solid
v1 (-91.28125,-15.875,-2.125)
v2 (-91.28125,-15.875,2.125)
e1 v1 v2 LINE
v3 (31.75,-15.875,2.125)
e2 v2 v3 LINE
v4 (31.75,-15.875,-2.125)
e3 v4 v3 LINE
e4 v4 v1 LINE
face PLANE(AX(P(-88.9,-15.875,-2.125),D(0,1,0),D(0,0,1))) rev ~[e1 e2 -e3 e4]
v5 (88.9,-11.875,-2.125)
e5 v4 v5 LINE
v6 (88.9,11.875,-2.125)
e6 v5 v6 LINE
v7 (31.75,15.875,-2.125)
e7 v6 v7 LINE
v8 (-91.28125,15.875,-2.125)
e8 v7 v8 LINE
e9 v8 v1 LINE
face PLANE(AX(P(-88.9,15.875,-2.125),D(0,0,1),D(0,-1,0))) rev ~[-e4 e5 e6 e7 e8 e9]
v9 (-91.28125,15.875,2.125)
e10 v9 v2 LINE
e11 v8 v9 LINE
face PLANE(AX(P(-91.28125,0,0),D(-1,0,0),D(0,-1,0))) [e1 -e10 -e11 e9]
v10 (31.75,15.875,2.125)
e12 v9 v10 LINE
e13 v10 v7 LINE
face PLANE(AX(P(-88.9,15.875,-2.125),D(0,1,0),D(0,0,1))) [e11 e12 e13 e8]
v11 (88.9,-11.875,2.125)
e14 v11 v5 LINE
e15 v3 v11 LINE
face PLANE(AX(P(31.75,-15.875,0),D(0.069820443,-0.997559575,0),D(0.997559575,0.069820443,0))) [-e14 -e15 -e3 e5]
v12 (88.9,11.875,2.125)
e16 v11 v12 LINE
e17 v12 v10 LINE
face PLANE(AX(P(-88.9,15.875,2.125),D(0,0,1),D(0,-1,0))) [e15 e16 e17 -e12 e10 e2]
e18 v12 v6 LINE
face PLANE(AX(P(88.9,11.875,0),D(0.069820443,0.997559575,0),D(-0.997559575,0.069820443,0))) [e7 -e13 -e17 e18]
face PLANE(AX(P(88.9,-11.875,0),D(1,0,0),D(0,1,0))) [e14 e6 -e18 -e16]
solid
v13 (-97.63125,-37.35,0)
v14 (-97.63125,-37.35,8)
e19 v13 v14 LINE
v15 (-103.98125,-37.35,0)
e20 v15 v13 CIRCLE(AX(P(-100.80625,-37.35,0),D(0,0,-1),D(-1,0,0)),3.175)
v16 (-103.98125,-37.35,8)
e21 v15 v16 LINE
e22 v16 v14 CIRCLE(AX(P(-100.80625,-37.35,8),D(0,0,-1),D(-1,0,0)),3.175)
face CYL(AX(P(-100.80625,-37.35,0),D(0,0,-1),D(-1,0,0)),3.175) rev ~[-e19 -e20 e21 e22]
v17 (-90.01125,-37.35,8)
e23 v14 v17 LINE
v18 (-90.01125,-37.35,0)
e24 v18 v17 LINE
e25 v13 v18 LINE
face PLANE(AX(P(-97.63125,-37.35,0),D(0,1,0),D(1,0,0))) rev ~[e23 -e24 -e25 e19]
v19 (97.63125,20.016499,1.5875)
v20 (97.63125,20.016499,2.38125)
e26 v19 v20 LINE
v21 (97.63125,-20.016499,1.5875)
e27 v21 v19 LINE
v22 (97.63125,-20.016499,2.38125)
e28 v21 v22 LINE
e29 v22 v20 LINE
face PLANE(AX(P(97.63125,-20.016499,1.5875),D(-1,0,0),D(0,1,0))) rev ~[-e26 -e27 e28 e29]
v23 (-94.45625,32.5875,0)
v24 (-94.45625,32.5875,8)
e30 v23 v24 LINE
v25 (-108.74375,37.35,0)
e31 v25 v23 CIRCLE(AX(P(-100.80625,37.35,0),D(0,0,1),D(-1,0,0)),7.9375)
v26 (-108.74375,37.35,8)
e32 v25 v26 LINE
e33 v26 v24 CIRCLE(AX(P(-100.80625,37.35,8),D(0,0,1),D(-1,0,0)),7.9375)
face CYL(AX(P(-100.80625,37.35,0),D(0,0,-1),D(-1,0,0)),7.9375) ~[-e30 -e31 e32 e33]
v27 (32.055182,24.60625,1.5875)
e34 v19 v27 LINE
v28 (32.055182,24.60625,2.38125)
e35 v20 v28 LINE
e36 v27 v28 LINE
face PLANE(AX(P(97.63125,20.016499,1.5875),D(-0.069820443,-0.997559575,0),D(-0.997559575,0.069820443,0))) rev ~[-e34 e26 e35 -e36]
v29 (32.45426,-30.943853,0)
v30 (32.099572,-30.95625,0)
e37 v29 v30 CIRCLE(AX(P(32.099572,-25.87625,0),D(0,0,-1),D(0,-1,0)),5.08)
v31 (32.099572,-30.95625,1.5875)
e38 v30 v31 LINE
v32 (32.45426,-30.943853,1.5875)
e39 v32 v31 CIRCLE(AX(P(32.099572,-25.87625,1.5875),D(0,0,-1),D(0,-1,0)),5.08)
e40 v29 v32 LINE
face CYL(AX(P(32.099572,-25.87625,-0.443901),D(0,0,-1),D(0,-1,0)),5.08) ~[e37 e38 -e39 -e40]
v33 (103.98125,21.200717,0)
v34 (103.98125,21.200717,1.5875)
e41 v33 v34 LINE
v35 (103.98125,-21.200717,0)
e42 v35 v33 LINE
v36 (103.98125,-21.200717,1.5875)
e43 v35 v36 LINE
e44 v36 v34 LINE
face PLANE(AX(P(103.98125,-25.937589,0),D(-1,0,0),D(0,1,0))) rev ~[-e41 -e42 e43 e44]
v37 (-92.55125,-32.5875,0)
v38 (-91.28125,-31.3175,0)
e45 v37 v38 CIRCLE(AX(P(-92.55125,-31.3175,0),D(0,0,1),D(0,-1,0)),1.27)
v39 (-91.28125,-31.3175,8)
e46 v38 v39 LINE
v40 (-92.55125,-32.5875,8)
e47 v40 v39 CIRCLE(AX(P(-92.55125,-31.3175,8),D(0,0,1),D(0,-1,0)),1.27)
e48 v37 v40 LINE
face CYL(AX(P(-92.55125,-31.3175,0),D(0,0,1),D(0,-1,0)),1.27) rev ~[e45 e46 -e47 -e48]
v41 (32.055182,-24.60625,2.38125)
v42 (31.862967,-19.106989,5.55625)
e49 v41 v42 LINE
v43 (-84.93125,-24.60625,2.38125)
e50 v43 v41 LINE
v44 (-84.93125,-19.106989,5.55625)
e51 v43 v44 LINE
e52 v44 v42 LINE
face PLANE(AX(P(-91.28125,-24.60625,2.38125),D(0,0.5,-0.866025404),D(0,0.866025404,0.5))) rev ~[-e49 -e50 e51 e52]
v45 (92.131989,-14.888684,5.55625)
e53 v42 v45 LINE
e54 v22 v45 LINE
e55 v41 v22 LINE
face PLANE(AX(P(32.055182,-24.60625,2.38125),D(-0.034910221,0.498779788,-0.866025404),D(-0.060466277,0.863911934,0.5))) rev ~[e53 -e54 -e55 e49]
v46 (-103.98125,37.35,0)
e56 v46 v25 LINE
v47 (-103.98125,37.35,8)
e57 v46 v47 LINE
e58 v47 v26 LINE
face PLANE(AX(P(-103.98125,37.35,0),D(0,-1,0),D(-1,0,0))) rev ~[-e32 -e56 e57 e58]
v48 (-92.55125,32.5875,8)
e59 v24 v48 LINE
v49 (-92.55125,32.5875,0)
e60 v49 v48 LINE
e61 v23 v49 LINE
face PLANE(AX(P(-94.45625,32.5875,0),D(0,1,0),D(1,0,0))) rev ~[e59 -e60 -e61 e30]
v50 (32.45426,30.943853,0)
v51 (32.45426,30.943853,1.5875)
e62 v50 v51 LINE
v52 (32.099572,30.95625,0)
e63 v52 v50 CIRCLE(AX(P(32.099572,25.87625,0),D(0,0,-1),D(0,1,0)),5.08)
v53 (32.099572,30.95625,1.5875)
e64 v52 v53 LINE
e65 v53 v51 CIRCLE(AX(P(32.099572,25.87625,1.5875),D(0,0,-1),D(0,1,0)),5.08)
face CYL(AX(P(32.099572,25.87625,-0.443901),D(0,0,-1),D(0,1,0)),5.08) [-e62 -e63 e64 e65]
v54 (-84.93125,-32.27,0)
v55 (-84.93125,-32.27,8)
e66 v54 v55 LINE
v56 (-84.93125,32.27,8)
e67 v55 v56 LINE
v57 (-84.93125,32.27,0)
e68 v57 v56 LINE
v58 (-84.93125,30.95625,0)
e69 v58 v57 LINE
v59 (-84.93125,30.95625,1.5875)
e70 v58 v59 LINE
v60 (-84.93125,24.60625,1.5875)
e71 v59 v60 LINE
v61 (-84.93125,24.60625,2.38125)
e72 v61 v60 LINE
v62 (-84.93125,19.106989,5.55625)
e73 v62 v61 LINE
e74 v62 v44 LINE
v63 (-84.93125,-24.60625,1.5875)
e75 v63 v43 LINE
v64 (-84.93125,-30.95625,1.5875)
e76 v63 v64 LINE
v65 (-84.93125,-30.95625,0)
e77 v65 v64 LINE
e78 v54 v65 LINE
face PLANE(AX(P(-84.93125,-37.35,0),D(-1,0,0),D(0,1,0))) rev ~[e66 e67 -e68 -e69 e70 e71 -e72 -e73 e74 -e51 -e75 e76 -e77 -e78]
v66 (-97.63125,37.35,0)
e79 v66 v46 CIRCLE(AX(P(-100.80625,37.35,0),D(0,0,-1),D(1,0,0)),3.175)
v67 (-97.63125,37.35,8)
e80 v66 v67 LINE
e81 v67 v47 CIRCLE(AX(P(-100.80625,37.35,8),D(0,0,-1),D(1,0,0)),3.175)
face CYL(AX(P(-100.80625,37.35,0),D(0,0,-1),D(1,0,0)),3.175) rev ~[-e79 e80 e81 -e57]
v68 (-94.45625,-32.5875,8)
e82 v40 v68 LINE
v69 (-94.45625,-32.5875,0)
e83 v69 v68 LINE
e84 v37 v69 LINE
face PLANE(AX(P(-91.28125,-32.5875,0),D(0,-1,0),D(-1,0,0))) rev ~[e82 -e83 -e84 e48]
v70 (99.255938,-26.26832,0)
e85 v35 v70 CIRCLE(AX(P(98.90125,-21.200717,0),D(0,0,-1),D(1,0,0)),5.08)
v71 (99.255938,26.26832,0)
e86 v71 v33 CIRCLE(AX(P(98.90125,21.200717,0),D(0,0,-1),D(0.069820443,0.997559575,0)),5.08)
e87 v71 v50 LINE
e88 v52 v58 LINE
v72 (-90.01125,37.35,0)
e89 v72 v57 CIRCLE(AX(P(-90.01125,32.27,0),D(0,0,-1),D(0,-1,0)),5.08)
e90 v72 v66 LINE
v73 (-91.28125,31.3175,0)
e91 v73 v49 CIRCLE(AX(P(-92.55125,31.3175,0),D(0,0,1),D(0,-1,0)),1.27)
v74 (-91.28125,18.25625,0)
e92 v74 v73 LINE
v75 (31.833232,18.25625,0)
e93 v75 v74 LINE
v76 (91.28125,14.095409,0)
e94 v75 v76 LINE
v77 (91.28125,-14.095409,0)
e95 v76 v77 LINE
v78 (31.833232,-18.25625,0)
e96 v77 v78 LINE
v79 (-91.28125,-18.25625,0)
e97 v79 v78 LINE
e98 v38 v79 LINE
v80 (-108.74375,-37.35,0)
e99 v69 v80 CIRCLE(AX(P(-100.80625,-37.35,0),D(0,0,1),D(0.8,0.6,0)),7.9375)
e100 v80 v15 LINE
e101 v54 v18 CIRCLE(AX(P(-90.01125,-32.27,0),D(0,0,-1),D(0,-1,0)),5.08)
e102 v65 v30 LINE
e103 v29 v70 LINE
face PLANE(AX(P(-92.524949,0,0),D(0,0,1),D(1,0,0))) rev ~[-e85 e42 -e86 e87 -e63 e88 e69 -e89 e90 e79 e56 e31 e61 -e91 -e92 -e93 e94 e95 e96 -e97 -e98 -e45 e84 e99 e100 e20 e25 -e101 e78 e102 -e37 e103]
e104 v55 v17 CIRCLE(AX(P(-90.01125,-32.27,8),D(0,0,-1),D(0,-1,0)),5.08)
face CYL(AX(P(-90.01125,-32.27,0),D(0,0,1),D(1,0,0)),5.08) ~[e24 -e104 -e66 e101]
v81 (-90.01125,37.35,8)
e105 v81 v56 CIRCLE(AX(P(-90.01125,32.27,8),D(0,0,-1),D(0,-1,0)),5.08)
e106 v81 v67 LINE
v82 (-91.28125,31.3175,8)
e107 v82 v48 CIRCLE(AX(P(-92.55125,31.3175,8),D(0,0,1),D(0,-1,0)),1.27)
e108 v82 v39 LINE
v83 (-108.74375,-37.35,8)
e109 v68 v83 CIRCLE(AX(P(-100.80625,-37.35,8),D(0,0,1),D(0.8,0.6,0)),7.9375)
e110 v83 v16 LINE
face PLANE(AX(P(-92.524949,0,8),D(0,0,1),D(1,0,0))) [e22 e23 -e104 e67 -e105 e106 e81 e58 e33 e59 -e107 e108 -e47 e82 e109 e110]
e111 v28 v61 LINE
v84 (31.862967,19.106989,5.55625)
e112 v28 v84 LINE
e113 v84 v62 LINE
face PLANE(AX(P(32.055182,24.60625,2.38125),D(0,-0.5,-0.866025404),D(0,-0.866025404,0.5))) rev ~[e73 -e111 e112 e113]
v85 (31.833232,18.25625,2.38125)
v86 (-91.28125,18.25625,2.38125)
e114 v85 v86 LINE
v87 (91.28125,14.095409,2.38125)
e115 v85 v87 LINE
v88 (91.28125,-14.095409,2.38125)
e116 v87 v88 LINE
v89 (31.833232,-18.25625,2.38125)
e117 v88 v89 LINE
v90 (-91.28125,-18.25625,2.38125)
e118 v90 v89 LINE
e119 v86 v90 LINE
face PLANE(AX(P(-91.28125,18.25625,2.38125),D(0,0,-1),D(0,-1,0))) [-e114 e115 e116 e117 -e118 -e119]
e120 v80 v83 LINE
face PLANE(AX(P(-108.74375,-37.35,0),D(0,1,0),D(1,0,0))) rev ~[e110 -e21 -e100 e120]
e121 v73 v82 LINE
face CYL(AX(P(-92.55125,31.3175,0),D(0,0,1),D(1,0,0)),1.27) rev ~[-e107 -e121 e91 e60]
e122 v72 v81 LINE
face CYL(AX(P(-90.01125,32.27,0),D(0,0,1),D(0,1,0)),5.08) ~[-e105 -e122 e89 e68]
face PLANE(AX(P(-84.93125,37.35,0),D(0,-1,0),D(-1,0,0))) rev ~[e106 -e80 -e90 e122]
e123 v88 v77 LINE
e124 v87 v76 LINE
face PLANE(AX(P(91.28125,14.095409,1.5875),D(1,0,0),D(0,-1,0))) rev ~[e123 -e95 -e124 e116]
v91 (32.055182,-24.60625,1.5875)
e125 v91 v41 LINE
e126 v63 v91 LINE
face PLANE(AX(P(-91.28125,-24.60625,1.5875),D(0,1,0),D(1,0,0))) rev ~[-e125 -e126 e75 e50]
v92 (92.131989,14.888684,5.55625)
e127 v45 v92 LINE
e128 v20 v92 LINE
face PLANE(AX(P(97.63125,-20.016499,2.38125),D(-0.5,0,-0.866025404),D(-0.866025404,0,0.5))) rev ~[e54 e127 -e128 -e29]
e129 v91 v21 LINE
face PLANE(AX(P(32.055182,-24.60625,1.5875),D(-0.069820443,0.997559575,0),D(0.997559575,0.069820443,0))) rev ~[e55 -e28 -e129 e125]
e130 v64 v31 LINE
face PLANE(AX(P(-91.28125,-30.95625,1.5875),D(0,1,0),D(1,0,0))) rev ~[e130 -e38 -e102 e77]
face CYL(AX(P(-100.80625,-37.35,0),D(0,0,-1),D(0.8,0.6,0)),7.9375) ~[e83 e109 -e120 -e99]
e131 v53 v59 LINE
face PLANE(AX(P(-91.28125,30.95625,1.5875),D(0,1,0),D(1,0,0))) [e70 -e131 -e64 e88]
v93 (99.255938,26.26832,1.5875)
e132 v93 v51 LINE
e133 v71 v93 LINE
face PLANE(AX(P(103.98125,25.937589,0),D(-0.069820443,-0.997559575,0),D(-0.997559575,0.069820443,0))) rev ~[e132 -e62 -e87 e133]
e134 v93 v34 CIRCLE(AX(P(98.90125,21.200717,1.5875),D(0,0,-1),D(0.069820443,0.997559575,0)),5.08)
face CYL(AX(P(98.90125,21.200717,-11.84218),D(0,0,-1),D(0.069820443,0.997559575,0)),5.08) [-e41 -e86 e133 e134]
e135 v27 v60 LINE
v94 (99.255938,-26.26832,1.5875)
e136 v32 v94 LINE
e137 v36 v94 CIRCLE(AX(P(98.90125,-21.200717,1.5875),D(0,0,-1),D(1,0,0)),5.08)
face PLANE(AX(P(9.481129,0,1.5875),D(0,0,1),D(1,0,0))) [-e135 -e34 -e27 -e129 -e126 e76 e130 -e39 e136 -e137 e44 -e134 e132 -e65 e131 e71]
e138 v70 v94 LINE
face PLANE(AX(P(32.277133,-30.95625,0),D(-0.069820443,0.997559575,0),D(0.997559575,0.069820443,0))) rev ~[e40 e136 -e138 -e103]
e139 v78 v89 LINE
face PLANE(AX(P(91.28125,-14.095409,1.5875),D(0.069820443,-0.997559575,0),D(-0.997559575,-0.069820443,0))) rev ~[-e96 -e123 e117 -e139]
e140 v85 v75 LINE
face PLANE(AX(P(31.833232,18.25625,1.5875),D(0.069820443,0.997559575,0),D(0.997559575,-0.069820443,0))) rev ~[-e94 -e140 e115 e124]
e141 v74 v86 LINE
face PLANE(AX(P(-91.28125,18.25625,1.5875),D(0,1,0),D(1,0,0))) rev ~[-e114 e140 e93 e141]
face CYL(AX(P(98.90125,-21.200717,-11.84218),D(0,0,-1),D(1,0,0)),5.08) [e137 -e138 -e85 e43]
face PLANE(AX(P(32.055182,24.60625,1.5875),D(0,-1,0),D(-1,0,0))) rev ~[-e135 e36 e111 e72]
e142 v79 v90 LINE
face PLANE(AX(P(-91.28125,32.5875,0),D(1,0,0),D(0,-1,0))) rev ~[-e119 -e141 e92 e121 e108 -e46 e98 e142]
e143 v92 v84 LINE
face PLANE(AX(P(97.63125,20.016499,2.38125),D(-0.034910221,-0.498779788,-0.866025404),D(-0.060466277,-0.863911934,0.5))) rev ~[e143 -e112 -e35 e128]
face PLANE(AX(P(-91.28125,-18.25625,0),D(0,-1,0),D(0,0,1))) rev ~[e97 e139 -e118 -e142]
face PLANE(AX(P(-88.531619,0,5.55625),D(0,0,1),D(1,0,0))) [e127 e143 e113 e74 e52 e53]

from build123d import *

# Parameters (mm, degrees)
F1_DEPTH    = 2.125
F3_DEPTH    = 1.5875
F5_DEPTH    = 0.79375
F7_DEPTH    = 3.175
F7_TAPER    = 60
F8_T1_DEPTH = 25.2718606601
F8_T3_DEPTH = 2.4753029305
F9_W        = 5.499261314
F9_H        = 61.9125
F10_DEPTH   = 3.96875
F11_W       = 31.75
F11_H       = 4.25
F12_DEPTH   = 2.38125
F14_DEPTH   = 8
F15_W       = 36.5125
F15_H       = 2.38125
F16_DEPTH   = 25.4
F17_R       = 5.08
F18_R       = 1.27


# Not quite as in the source:
# - a fillet or chamfer that OpenCascade refuses, or shapes differently, is made with other operations: its cross-section is extruded or revolved along the edge and cut away or added


with BuildPart() as f1:
    # F0 (on Top) → F1 (new body, symmetric)
    with BuildSketch(Plane.XY):
        Polygon((31.75, 15.875), (-88.9, 15.875), (-88.9, -15.875), (31.75, -15.875), (88.9, -11.875), (88.9, 11.875), align=None)
    extrude(amount=F1_DEPTH, both=True)

    # F11 (on face) → F12 (join, through all)
    with BuildSketch(Plane(origin=(-88.9, 0, 0), x_dir=(0, -1, 0), z_dir=(-1, 0, 0))):
        Rectangle(F11_W, F11_H)
    extrude(amount=F12_DEPTH)


with BuildPart() as f3:
    # F2 (on Top) → F3 (new body)
    with BuildSketch(Plane.XY):
        Polygon((-91.28125, 18.25625), (31.8332315247, 18.25625), (91.28125, 14.0954088119), (91.28125, -14.0954088119), (31.8332315247, -18.25625), (-91.28125, -18.25625), (-91.28125, -30.95625), (32.27713299, -30.95625), (103.98125, -25.9375891419), (103.98125, 25.9375891419), (32.27713299, 30.95625), (-91.28125, 30.95625), align=None)
    extrude(amount=F3_DEPTH)

    # F4 (on face) → F5 (join)
    with BuildSketch(Plane.XY.offset(1.5875)):
        Polygon((91.28125, -14.0954088119), (31.8332315247, -18.25625), (-91.28125, -18.25625), (-91.28125, -24.60625), (32.0551822574, -24.60625), (97.63125, -20.0164989769), (97.63125, 20.0164989769), (32.0551822574, 24.60625), (-91.28125, 24.60625), (-91.28125, 18.25625), (31.8332315247, 18.25625), (91.28125, 14.0954088119), align=None)
    extrude(amount=F5_DEPTH)

    # F6 (on face) → F7 (join)
    with BuildSketch(Plane.XY.offset(2.38125)):
        Polygon((-91.28125, 24.60625), (-91.28125, -24.60625), (32.0551822574, -24.60625), (97.63125, -20.0164989769), (97.63125, 20.0164989769), (32.0551822574, 24.60625), align=None)
    extrude(amount=F7_DEPTH, taper=F7_TAPER)

    # F8: fillet of radius 5.08 on 4 edges, made by hand

    # F8_s2 → F8_t1 (cut)
    with BuildSketch(Plane.XY.offset(-11.84218033)):
        with BuildLine():
            ThreePointArc((103.98125, -21.2007170099), (102.616637885, -24.6651495556), (99.2559378489, -26.2683196512))
            Line((99.2559378489, -26.2683196512), (103.98125, -25.9375891419))
            Line((103.98125, -25.9375891419), (103.98125, -21.2007170099))
        make_face()
        with BuildLine():
            ThreePointArc((99.2559378489, 26.2683196512), (102.616637885, 24.6651495556), (103.98125, 21.2007170099))
            Line((103.98125, 21.2007170099), (103.98125, 25.9375891419))
            Line((103.98125, 25.9375891419), (99.2559378489, 26.2683196512))
        make_face()
    extrude(amount=F8_T1_DEPTH, mode=Mode.SUBTRACT)

    # F8_s4 → F8_t3 (cut)
    with BuildSketch(Plane.XY.offset(-0.4439014652)):
        with BuildLine():
            ThreePointArc((32.0995724039, -30.95625), (32.2770246261, -30.9531497143), (32.4542602528, -30.9438526413))
            Line((32.4542602528, -30.9438526413), (32.27713299, -30.95625))
            Line((32.27713299, -30.95625), (32.0995724039, -30.95625))
        make_face()
        with BuildLine():
            ThreePointArc((32.0995724039, 30.95625), (32.2770246261, 30.9531497143), (32.4542602528, 30.9438526413))
            Line((32.4542602528, 30.9438526413), (32.27713299, 30.95625))
            Line((32.27713299, 30.95625), (32.0995724039, 30.95625))
        make_face()
    extrude(amount=F8_T3_DEPTH, mode=Mode.SUBTRACT)

    # F9 (on face) → F10 (join, through all)
    with BuildSketch(Plane.XY.offset(1.5875)):
        with Locations((-88.531619343, 0)):
            Rectangle(F9_W, F9_H)
    extrude(amount=F10_DEPTH)

    # F13 (on Top) → F14 (join)
    with BuildSketch(Plane.XY):
        with BuildLine():
            Line((-103.98125, 37.35), (-108.74375, 37.35))
            ThreePointArc((-108.74375, 37.35), (-103.3163078928, 29.8198263217), (-94.45625, 32.5875))
            Line((-94.45625, 32.5875), (-91.28125, 32.5875))
            Line((-91.28125, 32.5875), (-91.28125, 0))
            Line((-91.28125, 0), (-91.28125, -32.5875))
            Line((-91.28125, -32.5875), (-94.45625, -32.5875))
            ThreePointArc((-94.45625, -32.5875), (-103.3163078928, -29.8198263217), (-108.74375, -37.35))
            Line((-108.74375, -37.35), (-103.98125, -37.35))
            ThreePointArc((-103.98125, -37.35), (-100.80625, -34.175), (-97.63125, -37.35))
            Line((-97.63125, -37.35), (-84.93125, -37.35))
            Line((-84.93125, -37.35), (-84.93125, 0))
            Line((-84.93125, 0), (-84.93125, 37.35))
            Line((-84.93125, 37.35), (-97.63125, 37.35))
            ThreePointArc((-97.63125, 37.35), (-100.80625, 34.175), (-103.98125, 37.35))
        make_face()
    extrude(amount=F14_DEPTH)

    # F15 (on face) → F16 (cut)
    with BuildSketch(Plane(origin=(-91.28125, 0, 0), x_dir=(0, -1, 0), z_dir=(-1, 0, 0))):
        with Locations((0, 1.190625)):
            Rectangle(F15_W, F15_H)
    extrude(amount=-F16_DEPTH, mode=Mode.SUBTRACT)

    # F17
    f17_edges = [f3.edges().sort_by_distance(p)[0] for p in [
        (-84.93125, 37.35, 4),
        (-84.93125, -37.35, 4),
    ]]
    fillet(f17_edges, radius=F17_R)

    # F18
    f18_edges = [f3.edges().sort_by_distance(p)[0] for p in [
        (-91.28125, -32.5875, 4),
        (-91.28125, 32.5875, 4),
    ]]
    fillet(f18_edges, radius=F18_R)


solid = Compound([f1.part, f3.part])
